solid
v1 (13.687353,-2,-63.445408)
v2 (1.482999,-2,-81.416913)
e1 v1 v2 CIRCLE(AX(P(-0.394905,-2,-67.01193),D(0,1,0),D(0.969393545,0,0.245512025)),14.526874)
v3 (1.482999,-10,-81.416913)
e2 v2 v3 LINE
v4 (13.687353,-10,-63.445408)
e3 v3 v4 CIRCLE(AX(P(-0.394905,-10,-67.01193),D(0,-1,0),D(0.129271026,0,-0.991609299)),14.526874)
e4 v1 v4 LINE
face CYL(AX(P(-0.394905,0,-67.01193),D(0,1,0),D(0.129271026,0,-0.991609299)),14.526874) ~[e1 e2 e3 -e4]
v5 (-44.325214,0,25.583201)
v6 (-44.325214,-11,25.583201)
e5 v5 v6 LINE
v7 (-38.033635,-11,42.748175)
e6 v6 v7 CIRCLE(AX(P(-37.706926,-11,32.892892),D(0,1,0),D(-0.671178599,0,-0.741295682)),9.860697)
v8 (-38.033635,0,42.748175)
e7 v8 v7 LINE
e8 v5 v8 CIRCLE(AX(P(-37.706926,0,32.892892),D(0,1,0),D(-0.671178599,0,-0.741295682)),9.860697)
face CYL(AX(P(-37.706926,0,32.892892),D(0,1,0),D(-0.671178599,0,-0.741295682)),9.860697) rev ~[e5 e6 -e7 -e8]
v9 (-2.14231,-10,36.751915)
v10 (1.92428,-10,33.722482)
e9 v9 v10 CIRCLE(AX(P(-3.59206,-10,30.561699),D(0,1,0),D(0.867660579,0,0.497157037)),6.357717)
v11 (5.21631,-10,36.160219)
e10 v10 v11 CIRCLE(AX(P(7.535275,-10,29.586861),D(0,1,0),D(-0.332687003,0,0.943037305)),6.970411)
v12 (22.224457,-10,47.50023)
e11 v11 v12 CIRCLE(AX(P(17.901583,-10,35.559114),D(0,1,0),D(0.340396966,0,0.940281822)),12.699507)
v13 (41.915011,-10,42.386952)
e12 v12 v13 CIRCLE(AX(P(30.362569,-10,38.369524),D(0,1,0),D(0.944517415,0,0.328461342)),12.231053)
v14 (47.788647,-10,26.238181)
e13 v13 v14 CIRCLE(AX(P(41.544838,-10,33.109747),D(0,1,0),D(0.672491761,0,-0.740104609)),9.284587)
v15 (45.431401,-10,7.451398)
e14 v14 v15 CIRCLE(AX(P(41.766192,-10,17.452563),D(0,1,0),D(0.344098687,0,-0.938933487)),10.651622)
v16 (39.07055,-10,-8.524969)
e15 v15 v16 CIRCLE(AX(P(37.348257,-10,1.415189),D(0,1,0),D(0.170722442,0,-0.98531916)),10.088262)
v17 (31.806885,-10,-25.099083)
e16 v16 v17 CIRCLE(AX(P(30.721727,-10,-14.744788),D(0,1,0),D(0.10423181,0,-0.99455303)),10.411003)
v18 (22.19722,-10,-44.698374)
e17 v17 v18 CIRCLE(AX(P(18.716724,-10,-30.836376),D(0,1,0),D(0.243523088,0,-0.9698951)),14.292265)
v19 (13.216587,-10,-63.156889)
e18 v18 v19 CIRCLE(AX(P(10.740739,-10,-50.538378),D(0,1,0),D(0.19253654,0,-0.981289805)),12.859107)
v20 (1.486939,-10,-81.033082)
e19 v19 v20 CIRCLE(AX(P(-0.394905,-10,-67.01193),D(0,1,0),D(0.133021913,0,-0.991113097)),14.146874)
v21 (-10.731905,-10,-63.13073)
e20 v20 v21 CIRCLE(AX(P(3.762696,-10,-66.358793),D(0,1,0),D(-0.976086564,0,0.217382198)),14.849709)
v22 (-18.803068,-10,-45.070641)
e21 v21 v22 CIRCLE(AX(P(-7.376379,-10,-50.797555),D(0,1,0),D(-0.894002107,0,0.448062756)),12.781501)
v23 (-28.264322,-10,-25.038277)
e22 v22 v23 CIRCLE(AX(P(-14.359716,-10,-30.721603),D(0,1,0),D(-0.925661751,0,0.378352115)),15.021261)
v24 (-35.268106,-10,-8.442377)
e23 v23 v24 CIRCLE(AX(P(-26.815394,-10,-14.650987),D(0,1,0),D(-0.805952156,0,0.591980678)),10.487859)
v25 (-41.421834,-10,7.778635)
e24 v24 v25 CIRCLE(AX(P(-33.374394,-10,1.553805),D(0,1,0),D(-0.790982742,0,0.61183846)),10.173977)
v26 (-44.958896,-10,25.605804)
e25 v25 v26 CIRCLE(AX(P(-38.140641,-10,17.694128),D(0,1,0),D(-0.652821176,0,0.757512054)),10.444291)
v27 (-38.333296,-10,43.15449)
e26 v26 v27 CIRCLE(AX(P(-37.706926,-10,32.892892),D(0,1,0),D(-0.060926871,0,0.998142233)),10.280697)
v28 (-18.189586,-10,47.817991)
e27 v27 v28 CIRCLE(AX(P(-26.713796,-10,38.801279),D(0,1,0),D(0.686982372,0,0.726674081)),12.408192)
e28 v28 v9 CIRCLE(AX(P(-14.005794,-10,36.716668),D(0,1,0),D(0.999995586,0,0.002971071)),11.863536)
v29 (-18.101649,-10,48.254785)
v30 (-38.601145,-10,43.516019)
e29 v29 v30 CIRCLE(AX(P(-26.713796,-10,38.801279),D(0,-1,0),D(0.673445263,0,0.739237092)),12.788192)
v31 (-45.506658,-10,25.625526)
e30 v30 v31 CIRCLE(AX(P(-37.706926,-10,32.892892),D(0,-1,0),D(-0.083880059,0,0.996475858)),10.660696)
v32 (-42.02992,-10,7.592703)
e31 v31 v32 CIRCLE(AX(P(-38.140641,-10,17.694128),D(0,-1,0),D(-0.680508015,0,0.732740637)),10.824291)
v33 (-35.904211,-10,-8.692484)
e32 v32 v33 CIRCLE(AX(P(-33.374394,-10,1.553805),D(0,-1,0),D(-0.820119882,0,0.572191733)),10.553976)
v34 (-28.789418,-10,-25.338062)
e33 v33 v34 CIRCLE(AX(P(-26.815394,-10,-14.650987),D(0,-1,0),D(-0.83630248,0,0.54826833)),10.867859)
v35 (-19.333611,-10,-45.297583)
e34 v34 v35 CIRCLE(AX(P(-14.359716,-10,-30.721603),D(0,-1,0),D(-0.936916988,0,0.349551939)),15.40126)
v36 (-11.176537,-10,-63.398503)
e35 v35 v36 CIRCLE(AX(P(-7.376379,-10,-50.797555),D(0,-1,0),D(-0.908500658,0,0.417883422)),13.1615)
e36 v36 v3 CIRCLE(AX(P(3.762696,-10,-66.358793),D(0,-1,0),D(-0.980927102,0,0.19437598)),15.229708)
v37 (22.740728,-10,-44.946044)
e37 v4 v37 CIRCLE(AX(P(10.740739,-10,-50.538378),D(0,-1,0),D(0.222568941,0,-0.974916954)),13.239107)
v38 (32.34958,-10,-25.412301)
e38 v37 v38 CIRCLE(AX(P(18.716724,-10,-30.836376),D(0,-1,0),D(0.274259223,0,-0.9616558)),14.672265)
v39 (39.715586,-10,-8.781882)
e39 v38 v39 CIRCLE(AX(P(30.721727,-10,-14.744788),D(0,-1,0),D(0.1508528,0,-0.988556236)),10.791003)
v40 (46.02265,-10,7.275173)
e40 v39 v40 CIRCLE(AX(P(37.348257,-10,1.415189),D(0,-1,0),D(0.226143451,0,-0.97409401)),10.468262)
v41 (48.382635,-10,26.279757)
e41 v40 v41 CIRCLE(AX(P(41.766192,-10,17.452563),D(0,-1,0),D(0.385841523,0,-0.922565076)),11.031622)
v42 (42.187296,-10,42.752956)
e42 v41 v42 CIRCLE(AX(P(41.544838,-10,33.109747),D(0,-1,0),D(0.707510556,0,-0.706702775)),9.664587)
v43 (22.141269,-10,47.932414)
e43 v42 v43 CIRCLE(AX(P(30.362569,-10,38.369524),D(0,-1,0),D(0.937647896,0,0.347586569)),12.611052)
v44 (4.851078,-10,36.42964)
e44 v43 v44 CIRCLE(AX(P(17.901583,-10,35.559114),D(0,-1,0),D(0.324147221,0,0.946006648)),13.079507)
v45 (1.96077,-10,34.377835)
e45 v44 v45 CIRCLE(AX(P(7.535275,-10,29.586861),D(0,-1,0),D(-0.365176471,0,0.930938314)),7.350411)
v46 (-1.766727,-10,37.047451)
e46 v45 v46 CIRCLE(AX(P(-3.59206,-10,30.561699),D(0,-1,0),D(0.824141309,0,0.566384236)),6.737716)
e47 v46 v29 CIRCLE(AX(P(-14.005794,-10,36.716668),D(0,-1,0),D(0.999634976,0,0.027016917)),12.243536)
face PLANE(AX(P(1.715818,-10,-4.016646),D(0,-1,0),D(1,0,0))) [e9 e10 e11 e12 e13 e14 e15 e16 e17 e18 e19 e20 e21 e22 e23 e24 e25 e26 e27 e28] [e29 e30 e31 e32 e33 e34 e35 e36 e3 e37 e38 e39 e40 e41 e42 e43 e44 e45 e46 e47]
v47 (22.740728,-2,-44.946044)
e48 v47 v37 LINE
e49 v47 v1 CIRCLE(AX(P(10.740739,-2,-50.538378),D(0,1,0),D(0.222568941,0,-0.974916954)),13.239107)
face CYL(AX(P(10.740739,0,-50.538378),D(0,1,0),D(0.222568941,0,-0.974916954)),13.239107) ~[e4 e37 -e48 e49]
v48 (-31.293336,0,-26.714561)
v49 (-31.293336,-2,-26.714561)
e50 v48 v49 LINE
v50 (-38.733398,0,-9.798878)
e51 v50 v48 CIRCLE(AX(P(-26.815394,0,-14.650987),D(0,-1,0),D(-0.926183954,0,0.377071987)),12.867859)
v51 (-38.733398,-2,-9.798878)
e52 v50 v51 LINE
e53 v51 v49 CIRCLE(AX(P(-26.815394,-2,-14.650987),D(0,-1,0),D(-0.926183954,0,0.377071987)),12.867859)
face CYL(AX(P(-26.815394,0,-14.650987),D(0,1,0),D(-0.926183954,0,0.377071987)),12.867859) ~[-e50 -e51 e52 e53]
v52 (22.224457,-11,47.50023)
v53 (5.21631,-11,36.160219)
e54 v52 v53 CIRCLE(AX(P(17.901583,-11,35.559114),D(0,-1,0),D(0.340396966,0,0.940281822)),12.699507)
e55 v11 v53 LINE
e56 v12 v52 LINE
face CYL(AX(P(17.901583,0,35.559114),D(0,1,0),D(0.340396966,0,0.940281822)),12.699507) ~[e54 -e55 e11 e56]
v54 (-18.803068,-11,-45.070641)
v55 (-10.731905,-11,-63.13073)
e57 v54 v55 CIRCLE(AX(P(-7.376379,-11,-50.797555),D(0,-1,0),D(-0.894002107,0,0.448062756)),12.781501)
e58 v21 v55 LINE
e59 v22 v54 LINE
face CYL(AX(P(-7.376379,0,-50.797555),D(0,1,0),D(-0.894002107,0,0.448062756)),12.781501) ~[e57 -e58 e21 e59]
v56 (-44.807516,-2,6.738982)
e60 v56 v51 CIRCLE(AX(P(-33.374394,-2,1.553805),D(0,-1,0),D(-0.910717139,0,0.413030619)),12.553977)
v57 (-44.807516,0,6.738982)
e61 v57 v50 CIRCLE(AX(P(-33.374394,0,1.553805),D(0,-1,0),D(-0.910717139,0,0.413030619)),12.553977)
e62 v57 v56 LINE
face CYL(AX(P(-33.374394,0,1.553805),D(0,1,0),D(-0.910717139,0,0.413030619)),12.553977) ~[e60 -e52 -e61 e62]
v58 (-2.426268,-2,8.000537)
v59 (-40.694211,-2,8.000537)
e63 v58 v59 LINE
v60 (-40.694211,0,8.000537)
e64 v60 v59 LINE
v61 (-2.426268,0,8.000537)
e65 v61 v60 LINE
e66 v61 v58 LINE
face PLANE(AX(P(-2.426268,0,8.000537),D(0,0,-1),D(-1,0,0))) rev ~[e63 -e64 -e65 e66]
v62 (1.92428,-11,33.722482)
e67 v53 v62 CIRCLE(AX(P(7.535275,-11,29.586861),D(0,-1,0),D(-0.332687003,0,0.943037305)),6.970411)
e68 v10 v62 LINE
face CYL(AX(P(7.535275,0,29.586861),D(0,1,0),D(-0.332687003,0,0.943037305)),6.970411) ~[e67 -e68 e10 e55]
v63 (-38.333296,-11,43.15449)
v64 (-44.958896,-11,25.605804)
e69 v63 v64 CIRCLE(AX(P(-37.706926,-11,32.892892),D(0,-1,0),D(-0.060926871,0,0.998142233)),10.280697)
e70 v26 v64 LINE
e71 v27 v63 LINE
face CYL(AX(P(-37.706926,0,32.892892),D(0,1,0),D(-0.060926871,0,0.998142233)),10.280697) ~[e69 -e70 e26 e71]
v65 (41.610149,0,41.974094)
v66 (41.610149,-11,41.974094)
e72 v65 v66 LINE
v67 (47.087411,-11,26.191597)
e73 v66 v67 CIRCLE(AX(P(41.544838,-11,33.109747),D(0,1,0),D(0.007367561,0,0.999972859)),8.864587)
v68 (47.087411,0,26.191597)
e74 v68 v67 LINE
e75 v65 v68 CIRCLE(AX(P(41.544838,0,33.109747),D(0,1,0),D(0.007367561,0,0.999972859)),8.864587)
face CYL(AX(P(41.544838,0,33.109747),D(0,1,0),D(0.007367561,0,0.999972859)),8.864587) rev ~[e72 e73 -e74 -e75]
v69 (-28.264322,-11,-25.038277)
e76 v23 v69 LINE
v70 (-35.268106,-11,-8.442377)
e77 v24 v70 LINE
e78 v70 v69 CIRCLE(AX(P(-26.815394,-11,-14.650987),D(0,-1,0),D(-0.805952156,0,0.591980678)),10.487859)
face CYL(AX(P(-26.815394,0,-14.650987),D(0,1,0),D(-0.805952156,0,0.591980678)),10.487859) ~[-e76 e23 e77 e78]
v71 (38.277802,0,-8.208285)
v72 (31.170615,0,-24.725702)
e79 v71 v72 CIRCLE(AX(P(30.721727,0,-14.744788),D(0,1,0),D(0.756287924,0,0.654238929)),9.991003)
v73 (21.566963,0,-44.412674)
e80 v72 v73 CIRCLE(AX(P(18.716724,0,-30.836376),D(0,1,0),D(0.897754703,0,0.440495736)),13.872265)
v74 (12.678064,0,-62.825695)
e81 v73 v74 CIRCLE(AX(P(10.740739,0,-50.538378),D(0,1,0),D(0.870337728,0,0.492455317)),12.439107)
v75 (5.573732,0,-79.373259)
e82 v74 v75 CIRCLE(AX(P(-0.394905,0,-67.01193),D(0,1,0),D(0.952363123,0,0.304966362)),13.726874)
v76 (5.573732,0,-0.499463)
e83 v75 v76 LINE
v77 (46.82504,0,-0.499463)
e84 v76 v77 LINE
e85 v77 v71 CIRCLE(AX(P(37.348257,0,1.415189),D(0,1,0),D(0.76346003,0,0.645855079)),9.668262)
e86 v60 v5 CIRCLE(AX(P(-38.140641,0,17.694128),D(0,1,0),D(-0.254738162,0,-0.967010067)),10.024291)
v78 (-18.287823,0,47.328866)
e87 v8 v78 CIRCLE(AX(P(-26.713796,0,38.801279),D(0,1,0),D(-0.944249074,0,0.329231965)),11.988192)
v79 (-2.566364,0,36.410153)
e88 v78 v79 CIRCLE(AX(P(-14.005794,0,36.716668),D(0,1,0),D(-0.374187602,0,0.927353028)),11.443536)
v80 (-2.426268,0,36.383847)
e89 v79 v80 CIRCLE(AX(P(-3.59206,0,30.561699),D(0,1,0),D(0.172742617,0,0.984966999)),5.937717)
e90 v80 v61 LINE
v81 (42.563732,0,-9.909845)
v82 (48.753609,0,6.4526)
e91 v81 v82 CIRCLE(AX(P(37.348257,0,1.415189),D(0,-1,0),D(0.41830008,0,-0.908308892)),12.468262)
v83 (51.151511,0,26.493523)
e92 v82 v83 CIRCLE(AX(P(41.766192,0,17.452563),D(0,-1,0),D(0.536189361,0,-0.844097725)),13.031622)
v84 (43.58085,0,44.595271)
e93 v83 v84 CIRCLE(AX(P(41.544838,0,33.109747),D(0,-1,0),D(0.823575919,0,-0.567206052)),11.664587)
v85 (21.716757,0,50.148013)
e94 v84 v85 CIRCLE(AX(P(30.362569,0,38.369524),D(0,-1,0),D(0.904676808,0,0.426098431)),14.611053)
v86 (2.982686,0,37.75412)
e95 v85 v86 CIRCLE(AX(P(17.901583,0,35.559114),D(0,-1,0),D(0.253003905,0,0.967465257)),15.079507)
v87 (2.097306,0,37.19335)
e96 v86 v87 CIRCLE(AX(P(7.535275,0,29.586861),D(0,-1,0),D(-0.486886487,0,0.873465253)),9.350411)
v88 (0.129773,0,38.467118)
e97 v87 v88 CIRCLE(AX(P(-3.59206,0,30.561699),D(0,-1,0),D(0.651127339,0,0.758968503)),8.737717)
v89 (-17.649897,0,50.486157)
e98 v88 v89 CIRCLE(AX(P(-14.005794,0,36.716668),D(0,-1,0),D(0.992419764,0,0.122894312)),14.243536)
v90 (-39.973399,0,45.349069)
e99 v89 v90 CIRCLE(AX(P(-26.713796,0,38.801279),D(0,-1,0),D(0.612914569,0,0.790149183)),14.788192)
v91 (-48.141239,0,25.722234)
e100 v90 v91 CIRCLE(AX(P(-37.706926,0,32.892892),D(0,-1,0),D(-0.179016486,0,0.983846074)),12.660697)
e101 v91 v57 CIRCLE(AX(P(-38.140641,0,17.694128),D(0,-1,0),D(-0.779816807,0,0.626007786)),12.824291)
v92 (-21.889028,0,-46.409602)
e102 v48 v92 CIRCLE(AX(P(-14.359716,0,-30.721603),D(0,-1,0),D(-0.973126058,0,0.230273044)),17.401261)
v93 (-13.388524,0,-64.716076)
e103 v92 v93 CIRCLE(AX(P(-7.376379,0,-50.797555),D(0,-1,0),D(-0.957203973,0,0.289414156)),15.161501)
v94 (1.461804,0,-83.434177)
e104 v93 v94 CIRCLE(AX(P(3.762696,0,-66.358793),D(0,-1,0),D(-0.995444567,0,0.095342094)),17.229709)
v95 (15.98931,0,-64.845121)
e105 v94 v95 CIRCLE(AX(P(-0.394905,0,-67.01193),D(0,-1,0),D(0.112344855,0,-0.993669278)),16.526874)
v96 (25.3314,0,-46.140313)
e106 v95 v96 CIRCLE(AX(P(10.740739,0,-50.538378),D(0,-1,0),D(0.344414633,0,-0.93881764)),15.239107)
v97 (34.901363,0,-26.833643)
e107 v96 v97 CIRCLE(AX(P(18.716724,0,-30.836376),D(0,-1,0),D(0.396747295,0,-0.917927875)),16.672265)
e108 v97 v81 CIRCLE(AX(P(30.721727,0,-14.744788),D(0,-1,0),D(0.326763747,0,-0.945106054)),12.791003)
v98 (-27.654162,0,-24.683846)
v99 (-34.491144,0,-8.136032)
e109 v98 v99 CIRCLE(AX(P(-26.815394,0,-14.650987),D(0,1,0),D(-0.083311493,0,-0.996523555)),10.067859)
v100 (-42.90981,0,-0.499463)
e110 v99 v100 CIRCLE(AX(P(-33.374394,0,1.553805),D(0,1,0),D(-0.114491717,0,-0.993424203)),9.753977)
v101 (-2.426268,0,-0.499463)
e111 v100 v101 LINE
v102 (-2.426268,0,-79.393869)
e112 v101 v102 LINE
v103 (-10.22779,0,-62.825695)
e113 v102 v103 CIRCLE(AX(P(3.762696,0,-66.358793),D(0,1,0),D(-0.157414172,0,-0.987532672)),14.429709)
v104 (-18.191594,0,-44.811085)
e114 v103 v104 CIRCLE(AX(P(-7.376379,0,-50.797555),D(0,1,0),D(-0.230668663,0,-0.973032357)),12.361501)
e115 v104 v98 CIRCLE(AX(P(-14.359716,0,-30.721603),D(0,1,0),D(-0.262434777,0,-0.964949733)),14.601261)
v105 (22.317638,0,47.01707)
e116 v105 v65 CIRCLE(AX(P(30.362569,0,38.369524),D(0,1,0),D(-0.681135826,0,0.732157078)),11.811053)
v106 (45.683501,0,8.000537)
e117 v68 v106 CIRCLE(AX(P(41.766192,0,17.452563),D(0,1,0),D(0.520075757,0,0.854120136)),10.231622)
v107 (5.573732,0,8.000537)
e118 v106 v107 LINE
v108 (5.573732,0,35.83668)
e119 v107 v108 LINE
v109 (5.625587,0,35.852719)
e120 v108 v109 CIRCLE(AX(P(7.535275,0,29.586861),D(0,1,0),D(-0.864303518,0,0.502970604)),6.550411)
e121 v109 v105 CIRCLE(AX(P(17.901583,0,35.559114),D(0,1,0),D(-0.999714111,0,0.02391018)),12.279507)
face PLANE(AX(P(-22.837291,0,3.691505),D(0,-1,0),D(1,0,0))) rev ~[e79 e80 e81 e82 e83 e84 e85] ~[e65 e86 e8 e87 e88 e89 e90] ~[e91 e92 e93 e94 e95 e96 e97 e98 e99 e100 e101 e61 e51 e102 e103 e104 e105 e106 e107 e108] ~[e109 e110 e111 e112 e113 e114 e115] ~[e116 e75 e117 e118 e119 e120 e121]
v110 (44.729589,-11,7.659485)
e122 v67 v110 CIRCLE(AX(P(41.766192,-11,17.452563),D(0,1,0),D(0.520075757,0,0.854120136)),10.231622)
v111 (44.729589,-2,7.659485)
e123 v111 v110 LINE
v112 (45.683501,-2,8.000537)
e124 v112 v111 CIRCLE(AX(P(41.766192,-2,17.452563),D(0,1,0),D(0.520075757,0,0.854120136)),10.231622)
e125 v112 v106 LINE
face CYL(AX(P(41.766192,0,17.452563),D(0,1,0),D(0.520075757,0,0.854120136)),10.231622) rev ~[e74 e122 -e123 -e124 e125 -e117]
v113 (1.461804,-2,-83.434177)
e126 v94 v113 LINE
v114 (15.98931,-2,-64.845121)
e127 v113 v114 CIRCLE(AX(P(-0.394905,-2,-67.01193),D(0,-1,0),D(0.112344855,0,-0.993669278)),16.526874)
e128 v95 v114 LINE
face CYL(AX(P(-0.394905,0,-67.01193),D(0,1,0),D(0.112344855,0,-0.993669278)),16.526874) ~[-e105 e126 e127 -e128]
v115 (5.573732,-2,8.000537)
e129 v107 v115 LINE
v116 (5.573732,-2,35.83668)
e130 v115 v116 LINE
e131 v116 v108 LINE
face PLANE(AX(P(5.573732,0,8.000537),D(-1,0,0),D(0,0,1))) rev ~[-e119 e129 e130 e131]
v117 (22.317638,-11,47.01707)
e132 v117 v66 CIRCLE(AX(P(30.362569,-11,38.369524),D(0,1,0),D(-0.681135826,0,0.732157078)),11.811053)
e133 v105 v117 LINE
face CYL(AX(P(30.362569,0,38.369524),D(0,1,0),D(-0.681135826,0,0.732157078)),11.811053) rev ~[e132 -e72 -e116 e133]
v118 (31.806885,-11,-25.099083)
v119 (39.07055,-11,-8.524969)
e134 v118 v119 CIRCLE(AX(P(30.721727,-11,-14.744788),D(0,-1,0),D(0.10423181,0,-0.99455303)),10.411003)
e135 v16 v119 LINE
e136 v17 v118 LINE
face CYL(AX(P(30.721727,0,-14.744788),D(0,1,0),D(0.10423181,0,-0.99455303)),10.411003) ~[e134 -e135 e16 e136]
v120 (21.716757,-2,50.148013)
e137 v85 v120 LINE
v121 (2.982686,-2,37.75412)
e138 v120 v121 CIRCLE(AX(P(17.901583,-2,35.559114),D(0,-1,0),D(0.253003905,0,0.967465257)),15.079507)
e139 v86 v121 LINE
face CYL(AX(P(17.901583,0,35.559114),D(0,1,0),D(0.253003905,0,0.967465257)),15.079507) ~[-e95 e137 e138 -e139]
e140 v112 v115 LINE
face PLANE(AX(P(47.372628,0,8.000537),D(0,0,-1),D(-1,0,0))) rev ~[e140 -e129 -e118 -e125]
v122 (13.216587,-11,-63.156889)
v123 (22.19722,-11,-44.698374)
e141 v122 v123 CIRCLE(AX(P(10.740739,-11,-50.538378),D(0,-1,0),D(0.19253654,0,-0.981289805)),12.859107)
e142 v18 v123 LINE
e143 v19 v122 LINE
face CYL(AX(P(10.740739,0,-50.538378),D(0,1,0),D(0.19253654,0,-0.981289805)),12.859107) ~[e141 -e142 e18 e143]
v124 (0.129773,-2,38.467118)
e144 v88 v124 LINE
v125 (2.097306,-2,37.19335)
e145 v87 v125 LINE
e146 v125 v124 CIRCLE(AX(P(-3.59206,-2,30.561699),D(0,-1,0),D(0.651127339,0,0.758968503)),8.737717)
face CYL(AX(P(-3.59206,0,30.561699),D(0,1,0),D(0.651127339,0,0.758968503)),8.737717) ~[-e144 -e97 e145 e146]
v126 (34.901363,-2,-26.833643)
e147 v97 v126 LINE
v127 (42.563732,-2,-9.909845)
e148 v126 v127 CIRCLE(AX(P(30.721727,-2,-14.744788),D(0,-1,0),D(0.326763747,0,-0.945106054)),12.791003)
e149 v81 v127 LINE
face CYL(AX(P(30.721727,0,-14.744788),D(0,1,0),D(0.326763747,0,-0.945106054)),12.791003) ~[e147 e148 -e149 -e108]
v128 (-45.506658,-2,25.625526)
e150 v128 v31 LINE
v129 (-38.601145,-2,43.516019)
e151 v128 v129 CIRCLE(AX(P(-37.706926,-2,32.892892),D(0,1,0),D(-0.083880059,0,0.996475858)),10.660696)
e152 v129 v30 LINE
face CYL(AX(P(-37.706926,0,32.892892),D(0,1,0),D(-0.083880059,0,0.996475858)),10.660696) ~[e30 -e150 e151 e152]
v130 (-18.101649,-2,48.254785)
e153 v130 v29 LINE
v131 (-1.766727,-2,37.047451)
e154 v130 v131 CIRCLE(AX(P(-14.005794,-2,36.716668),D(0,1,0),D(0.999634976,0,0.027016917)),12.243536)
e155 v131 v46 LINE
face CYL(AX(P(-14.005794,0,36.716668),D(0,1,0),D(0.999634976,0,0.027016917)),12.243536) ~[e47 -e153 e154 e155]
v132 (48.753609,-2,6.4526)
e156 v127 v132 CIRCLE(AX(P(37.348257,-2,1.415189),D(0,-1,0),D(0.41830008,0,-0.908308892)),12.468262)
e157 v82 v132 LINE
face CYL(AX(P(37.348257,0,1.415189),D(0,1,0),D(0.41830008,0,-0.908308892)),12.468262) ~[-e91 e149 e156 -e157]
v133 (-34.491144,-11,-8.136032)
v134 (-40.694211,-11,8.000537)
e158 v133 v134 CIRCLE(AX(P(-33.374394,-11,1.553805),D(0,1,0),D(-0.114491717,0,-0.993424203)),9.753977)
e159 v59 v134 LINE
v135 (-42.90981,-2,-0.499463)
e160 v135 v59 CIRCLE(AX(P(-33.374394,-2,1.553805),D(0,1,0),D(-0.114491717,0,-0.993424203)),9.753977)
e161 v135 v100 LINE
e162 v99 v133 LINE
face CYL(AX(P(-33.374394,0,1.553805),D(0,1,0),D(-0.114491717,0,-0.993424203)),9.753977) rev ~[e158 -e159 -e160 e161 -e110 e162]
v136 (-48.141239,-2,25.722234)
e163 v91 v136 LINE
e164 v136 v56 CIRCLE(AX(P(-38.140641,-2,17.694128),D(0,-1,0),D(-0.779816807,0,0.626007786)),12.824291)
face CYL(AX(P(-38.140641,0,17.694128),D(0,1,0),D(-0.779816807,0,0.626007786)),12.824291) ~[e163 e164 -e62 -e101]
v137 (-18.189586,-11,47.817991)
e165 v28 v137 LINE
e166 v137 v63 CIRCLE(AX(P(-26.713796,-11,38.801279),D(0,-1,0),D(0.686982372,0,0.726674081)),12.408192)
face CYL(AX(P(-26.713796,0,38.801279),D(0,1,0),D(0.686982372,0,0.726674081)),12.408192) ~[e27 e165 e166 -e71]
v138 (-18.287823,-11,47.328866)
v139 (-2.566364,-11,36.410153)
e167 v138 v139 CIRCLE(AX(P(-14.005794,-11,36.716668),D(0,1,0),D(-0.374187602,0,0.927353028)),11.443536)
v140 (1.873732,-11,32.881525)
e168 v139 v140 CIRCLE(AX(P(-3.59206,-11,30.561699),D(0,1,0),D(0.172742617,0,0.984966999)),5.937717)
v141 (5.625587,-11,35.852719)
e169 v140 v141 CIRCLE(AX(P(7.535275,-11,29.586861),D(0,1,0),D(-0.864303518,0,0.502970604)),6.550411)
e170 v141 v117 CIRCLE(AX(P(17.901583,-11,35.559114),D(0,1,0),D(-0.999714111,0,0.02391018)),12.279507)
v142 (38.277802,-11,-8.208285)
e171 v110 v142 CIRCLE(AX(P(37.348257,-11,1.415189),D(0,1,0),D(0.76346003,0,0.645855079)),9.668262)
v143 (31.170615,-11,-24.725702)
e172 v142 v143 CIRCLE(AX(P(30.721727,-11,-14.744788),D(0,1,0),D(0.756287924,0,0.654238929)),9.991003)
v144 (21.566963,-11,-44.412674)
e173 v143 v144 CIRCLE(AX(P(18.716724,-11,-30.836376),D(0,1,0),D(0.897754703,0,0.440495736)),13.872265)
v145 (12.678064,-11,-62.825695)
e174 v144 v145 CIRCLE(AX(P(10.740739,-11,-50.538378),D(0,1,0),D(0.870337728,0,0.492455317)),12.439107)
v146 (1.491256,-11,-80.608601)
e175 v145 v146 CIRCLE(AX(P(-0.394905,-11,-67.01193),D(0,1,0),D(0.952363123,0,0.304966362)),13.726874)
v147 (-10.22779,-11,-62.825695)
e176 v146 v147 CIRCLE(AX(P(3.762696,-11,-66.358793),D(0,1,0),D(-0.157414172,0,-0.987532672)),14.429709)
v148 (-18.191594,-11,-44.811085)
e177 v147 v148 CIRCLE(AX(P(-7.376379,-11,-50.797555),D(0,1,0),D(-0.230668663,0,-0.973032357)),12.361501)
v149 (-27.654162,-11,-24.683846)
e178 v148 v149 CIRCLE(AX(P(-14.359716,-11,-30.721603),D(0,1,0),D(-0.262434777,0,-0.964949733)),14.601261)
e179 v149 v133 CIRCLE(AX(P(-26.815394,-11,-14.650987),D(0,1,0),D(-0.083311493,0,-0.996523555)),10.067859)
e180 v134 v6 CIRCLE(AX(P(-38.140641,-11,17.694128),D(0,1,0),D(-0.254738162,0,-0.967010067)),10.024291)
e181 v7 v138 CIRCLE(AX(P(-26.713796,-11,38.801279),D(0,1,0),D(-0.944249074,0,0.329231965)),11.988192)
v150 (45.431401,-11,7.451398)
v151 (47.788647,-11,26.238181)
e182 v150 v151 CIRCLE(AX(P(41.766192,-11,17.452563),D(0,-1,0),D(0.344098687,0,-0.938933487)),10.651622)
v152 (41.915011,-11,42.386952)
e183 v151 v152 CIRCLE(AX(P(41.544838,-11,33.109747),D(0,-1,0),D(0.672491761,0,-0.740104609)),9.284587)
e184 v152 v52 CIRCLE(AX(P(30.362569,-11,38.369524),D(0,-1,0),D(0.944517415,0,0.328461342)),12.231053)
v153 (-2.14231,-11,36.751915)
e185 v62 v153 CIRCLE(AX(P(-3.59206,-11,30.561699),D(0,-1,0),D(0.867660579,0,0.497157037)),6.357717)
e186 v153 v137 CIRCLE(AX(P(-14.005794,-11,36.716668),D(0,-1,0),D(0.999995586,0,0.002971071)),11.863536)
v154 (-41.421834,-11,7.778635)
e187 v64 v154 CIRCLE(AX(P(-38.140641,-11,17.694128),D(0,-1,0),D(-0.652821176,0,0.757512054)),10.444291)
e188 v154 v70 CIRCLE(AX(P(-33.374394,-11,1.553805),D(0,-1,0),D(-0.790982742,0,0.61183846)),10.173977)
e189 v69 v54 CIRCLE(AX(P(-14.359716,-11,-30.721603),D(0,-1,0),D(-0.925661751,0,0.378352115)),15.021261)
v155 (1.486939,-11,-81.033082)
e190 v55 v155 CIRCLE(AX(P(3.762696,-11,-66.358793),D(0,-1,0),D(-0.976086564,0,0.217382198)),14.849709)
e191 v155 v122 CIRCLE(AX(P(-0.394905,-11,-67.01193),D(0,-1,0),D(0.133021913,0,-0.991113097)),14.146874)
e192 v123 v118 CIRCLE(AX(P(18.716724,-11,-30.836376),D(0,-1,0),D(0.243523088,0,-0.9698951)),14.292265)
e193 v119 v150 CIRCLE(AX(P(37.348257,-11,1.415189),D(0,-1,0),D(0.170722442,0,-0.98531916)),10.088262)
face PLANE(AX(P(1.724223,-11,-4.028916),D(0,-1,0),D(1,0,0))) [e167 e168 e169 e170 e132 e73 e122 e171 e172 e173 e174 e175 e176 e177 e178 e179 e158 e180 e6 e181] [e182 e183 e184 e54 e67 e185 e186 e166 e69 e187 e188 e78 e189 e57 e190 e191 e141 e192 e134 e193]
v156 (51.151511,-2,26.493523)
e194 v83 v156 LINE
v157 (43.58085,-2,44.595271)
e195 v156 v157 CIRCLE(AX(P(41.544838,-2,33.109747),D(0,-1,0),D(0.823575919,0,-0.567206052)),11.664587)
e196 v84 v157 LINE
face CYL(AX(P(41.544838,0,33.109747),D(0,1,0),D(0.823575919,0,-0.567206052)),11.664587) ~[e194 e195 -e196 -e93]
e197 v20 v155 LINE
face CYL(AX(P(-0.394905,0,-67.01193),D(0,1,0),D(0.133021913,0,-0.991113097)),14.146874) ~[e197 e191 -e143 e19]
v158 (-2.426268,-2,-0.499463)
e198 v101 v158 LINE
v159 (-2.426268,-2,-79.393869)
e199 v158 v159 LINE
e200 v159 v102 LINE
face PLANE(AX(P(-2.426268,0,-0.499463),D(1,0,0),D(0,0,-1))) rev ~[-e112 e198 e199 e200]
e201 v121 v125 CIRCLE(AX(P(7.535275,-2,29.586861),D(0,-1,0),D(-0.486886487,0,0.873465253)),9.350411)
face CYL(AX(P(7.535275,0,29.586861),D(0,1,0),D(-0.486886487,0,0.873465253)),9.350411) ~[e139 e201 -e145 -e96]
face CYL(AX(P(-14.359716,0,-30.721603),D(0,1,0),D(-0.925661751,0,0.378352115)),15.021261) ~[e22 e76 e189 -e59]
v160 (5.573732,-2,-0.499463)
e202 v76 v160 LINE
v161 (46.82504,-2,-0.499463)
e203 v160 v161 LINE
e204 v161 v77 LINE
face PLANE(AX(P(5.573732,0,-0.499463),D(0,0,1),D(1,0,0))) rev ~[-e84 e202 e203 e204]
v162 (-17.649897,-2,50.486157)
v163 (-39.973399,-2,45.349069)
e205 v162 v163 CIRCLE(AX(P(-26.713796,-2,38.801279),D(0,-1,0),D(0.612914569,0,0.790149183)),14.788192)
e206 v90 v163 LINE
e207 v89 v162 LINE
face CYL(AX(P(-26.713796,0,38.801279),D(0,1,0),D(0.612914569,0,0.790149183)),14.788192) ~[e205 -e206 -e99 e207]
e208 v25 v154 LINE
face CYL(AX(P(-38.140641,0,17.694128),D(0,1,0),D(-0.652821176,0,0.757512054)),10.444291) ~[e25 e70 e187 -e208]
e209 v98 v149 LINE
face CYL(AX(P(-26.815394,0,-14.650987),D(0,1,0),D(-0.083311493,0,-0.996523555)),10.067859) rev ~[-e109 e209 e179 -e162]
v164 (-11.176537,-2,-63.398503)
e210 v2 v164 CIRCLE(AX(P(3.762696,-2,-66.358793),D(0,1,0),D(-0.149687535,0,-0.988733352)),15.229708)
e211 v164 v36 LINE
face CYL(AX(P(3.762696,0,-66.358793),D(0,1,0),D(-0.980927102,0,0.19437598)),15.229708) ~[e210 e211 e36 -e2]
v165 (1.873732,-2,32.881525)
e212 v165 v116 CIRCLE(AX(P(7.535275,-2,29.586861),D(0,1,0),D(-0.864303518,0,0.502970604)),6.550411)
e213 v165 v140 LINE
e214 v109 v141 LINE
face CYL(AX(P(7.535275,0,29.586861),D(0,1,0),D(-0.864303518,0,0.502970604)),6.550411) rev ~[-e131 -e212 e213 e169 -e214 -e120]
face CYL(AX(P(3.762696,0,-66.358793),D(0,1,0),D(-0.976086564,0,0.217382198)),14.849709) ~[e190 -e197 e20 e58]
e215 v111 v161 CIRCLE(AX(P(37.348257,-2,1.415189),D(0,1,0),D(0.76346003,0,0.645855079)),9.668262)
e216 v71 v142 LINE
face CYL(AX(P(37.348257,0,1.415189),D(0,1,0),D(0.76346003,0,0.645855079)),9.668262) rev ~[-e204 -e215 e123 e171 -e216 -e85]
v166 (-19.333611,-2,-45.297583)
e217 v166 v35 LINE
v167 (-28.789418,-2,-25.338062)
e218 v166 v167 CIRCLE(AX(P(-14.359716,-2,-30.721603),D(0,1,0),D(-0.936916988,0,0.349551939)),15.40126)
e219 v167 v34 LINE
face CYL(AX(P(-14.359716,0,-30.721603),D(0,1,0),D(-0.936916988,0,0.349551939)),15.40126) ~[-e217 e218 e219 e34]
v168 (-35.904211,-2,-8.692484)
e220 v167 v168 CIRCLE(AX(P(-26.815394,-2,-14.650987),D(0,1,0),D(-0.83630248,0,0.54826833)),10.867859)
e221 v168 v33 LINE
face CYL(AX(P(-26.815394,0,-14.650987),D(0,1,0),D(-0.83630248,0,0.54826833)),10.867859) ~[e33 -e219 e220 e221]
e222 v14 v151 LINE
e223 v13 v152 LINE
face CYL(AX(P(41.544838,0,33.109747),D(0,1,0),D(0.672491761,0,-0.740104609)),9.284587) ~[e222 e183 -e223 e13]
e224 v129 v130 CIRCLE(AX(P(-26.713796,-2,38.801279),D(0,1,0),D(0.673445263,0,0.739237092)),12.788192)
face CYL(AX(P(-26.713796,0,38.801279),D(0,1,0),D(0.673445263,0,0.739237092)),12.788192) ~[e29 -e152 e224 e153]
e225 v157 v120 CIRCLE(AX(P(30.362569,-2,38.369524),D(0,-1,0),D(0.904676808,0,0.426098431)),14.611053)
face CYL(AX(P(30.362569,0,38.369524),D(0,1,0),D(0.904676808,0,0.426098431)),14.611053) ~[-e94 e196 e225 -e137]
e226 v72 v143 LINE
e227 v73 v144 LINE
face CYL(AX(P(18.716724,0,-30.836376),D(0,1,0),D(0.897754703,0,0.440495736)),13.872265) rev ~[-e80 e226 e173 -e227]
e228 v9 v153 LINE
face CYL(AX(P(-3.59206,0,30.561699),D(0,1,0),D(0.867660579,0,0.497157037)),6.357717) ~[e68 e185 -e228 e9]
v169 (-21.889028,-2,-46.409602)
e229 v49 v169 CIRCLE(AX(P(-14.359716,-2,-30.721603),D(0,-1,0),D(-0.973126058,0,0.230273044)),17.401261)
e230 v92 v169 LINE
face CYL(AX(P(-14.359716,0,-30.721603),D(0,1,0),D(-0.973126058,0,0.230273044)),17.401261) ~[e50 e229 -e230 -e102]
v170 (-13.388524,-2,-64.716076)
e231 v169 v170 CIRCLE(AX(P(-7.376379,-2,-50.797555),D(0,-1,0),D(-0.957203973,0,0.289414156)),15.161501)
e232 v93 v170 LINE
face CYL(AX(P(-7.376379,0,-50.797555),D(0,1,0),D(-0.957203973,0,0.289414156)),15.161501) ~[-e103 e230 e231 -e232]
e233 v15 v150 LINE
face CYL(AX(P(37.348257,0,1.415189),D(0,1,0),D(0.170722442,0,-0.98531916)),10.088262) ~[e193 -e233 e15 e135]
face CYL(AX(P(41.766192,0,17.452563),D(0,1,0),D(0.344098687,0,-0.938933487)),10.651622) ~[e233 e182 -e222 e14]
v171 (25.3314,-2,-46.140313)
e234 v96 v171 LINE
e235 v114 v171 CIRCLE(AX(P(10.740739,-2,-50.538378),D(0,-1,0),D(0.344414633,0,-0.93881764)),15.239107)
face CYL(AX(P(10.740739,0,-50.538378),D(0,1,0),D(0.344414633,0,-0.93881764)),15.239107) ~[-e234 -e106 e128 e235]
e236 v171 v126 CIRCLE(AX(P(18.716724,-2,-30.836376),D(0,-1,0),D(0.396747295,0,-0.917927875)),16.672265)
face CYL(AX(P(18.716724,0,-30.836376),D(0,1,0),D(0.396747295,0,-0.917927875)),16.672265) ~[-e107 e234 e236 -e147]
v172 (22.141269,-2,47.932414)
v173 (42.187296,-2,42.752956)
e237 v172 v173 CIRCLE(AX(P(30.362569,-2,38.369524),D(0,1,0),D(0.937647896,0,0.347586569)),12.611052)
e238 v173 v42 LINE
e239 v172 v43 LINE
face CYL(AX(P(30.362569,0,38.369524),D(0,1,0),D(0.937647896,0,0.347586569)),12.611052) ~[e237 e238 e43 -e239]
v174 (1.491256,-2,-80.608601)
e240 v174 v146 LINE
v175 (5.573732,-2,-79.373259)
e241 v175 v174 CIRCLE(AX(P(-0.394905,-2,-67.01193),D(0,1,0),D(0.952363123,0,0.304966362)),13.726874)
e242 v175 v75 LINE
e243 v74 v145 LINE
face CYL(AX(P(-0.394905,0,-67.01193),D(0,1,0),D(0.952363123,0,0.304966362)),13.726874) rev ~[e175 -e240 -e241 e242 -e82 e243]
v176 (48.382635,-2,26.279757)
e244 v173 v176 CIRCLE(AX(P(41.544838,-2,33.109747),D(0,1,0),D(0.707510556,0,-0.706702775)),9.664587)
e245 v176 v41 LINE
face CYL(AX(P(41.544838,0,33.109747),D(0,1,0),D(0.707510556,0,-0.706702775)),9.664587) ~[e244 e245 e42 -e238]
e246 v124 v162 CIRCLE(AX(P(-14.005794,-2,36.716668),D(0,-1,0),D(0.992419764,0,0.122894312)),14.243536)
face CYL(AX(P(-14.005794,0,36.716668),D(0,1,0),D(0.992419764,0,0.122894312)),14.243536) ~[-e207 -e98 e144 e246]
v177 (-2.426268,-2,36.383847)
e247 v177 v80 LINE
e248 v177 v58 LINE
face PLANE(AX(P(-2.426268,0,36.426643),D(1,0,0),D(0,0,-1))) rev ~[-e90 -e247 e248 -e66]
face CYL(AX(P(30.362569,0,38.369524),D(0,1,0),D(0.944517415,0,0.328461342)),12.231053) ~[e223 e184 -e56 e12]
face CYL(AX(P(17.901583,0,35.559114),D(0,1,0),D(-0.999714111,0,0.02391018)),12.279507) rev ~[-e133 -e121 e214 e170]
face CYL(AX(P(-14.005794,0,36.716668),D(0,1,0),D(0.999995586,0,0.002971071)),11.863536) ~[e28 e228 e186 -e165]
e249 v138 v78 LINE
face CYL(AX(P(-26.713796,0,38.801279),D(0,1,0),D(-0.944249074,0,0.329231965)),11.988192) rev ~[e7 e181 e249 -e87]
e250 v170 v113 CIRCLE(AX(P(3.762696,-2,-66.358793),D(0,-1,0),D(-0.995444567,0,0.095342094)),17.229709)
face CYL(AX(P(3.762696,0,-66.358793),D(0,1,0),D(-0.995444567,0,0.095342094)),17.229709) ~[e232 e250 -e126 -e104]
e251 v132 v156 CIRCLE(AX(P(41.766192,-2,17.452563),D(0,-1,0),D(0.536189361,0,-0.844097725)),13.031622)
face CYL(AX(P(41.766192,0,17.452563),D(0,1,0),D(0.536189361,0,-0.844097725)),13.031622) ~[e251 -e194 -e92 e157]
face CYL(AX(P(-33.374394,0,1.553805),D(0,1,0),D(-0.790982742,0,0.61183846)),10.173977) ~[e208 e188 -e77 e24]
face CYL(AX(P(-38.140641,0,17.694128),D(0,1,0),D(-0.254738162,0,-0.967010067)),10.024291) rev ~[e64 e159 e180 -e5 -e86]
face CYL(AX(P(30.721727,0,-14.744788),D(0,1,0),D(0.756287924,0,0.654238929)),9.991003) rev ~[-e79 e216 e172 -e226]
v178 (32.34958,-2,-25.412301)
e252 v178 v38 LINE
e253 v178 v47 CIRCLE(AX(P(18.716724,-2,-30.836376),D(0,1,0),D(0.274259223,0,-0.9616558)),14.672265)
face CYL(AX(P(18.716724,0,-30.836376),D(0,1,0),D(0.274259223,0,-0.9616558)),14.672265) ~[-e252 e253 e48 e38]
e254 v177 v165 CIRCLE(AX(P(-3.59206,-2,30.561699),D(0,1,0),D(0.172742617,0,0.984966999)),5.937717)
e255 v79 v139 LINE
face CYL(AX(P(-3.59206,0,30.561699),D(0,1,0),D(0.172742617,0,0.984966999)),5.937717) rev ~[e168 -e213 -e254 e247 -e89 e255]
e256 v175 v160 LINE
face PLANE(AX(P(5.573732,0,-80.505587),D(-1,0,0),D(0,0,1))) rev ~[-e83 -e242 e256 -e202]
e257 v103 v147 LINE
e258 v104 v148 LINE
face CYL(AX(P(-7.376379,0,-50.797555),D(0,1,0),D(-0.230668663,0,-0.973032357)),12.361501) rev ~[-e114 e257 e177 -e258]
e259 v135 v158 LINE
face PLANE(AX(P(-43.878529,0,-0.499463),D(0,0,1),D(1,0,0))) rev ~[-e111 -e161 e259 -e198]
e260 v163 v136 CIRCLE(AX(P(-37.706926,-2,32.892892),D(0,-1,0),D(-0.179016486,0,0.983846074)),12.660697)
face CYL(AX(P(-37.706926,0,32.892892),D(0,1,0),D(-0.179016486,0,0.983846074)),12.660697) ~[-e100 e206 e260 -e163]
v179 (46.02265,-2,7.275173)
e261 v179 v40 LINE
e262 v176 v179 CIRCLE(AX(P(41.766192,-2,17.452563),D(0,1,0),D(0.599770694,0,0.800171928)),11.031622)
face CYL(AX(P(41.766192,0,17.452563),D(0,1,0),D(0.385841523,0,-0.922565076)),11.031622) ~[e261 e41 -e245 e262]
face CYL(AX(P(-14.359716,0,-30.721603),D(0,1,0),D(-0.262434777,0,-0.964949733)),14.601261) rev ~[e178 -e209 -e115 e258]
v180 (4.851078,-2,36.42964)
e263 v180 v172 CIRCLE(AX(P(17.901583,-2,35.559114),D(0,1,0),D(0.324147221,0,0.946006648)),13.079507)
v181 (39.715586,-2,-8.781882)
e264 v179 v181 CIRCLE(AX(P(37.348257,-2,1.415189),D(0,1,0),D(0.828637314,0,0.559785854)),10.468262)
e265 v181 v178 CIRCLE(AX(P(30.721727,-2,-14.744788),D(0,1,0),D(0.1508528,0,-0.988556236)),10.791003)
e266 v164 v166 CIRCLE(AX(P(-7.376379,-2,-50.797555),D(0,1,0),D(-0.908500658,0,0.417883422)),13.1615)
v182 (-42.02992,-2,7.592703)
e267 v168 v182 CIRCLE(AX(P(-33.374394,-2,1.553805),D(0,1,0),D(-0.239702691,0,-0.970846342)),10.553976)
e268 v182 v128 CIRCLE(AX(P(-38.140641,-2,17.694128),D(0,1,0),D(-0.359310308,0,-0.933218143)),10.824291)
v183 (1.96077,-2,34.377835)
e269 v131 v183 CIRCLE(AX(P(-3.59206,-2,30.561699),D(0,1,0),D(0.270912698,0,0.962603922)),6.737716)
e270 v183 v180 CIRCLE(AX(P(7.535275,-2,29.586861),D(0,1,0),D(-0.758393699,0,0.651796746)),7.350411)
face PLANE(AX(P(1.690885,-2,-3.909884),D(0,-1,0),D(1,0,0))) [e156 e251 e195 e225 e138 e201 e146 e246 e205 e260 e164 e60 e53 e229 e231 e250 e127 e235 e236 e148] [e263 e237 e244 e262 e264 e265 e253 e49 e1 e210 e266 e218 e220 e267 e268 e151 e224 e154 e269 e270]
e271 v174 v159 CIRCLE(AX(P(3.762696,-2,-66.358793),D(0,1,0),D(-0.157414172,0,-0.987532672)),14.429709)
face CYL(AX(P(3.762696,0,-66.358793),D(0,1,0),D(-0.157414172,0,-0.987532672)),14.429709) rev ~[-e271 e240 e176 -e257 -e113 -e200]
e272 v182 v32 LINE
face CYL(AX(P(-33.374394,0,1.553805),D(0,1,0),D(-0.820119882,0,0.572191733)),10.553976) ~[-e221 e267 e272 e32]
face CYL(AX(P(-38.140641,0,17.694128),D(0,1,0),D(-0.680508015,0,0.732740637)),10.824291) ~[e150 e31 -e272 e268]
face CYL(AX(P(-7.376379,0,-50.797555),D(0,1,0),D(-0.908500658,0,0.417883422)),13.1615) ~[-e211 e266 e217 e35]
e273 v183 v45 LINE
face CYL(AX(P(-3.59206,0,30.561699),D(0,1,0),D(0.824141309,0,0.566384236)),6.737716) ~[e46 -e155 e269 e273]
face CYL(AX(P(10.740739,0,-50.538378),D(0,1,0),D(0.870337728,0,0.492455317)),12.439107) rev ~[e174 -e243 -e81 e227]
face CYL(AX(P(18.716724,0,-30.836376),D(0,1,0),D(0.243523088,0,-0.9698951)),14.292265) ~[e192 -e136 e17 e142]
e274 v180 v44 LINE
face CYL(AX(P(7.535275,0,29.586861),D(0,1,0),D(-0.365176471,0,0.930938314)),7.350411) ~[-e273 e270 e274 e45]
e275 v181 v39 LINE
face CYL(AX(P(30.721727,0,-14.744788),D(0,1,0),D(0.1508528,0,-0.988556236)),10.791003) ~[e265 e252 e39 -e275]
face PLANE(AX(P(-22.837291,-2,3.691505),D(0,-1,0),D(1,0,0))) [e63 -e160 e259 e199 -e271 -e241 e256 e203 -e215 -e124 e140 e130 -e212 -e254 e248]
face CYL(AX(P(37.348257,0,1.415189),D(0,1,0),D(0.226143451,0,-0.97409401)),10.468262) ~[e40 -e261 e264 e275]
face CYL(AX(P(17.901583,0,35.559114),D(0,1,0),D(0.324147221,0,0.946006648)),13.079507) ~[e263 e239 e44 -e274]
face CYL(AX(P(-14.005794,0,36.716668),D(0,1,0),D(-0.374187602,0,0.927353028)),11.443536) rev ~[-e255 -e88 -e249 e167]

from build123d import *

# Parameters (mm, degrees)
F1_DEPTH = 11
F3_DEPTH = 10
F5_DEPTH = 2
F6_W     = 8
F6_H     = 8.5
F7_DEPTH = 2


with BuildPart() as f1:
    # F0 (on Front) → F1 (new body)
    with BuildSketch(Plane.XZ):
        with BuildLine():
            ThreePointArc((39.0705500579, -8.52496936), (46.72096884, -2.3164746642), (45.4314010117, 7.451397609))
            ThreePointArc((45.4314010117, 7.451397609), (52.3349438106, 16.1264631775), (47.7886465249, 26.2381814678))
            ThreePointArc((47.7886465249, 26.2381814678), (50.2701969547, 36.2833369913), (41.9150114031, 42.3869520205))
            ThreePointArc((41.9150114031, 42.3869520205), (33.4367867693, 50.2079291964), (22.2244569704, 47.5002295437))
            ThreePointArc((22.2244569704, 47.5002295437), (10.8566281912, 46.1253851638), (5.2163100926, 36.1602188347))
            ThreePointArc((5.2163100926, 36.1602188347), (3.3871782253, 35.1886396049), (1.9242797709, 33.7224821441))
            ThreePointArc((1.9242797709, 33.7224821441), (0.2060931662, 35.6601876437), (-2.1423101686, 36.7519154435))
            ThreePointArc((-2.1423101686, 36.7519154435), (-7.2708907681, 46.4831703255), (-18.1895864419, 47.8179906611))
            ThreePointArc((-18.1895864419, 47.8179906611), (-29.5124145758, 50.8897432152), (-38.3332962899, 43.1544897295))
            ThreePointArc((-38.3332962899, 43.1544897295), (-47.3249375206, 36.5242237511), (-44.9588955164, 25.6058042591))
            ThreePointArc((-44.9588955164, 25.6058042591), (-48.3852347219, 15.6615137302), (-41.4218344822, 7.7786353488))
            ThreePointArc((-41.4218344822, 7.7786353488), (-42.8868566438, -2.0549157562), (-35.2681064262, -8.4423770976))
            ThreePointArc((-35.2681064262, -8.4423770976), (-36.4780330886, -18.7288037829), (-28.2643223371, -25.0382769915))
            ThreePointArc((-28.2643223371, -25.0382769915), (-27.9422707168, -37.1366223637), (-18.8030679193, -45.0706409052))
            ThreePointArc((-18.8030679193, -45.0706409052), (-19.0455768915, -56.0125901141), (-10.7319048048, -63.1307302875))
            ThreePointArc((-10.7319048048, -63.1307302875), (-8.5024893952, -74.7301167227), (1.486939211, -81.0330822839))
            ThreePointArc((1.486939211, -81.0330822839), (11.4330463974, -74.7729616567), (13.2165865743, -63.1568890473))
            ThreePointArc((13.2165865743, -63.1568890473), (22.3038978548, -56.1642100409), (22.1972204462, -44.6983735723))
            ThreePointArc((22.1972204462, -44.6983735723), (31.5494835172, -37.1283643345), (31.8068847226, -25.0990830165))
            ThreePointArc((31.8068847226, -25.0990830165), (40.2572033461, -18.9237451092), (39.0705500579, -8.52496936))
        make_face()
        with BuildLine():
            ThreePointArc((-18.287823031, 47.3288657516), (-7.4780325298, 46.1157556728), (-2.5663635332, 36.4101534549))
            ThreePointArc((-2.5663635332, 36.4101534549), (0.1022138006, 35.2102271012), (1.8737317574, 32.8815252377))
            ThreePointArc((1.8737317574, 32.8815252377), (3.4685951698, 34.7220338469), (5.6255866592, 35.8527190194))
            ThreePointArc((5.6255866592, 35.8527190194), (11.074771804, 45.7660203722), (22.3176378772, 47.0170698967))
            ThreePointArc((22.3176378772, 47.0170698967), (33.3495644247, 49.796633279), (41.6101485742, 41.9740937007))
            ThreePointArc((41.6101485742, 41.9740937007), (49.9194357762, 36.0161229225), (47.0874105005, 26.1915973646))
            ThreePointArc((47.0874105005, 26.1915973646), (51.915995427, 16.1612135783), (44.7295889669, 7.6594847256))
            ThreePointArc((44.7295889669, 7.6594847256), (46.3044950278, -2.2263904431), (38.2778021949, -8.2082847183))
            ThreePointArc((38.2778021949, -8.2082847183), (39.8992064768, -18.6937143429), (31.1706150566, -24.7257022472))
            ThreePointArc((31.1706150566, -24.7257022472), (31.1846152182, -36.91843323), (21.5669627376, -44.4126740578))
            ThreePointArc((21.5669627376, -44.4126740578), (21.9428314543, -55.9461967568), (12.6780636079, -62.8256952773))
            ThreePointArc((12.6780636079, -62.8256952773), (11.2241235412, -74.3211876976), (1.491255675, -80.6086013792))
            ThreePointArc((1.491255675, -80.6086013792), (-8.2859760991, -74.2989428398), (-10.2277903072, -62.8256952773))
            ThreePointArc((-10.2277903072, -62.8256952773), (-18.6823826488, -55.7956537612), (-18.1915944439, -44.8110853891))
            ThreePointArc((-18.1915944439, -44.8110853891), (-27.5735039539, -36.9338984851), (-27.6541622004, -24.6838456762))
            ThreePointArc((-27.6541622004, -24.6838456762), (-36.1203277284, -18.4954623496), (-34.4911439915, -8.1360315111))
            ThreePointArc((-34.4911439915, -8.1360315111), (-42.4788506232, -1.9460435419), (-40.6942105462, 8.0005371815))
            ThreePointArc((-40.6942105462, 8.0005371815), (-47.9577840613, 15.6667852228), (-44.3252140818, 25.5832006329))
            ThreePointArc((-44.3252140818, 25.5832006329), (-46.9652913596, 36.2864155083), (-38.0336352662, 42.7481750312))
            ThreePointArc((-38.0336352662, 42.7481750312), (-29.4229096781, 50.4793548119), (-18.287823031, 47.3288657516))
        make_face(mode=Mode.SUBTRACT)
    extrude(amount=F1_DEPTH)

    # F2 (on Front) → F3 (join)
    with BuildSketch(Plane.XZ):
        with BuildLine():
            ThreePointArc((-28.7894182833, -25.3380623372), (-28.2780674719, -37.315411053), (-19.3336110619, -45.2975825271))
            ThreePointArc((-19.3336110619, -45.2975825271), (-19.3757403856, -56.2049968971), (-11.1765373084, -63.3985031367))
            ThreePointArc((-11.1765373084, -63.3985031367), (-8.6987912382, -75.1140963115), (1.4829988261, -81.416913151))
            ThreePointArc((1.4829988261, -81.416913151), (11.6228084753, -75.1730955299), (13.6873525382, -63.445407948))
            ThreePointArc((13.6873525382, -63.445407948), (22.6321998986, -56.3579224617), (22.740727836, -44.9460441542))
            ThreePointArc((22.740727836, -44.9460441542), (31.8823212597, -37.3126706934), (32.3495800111, -25.4123013725))
            ThreePointArc((32.3495800111, -25.4123013725), (40.5882309676, -19.1148961819), (39.7155861385, -8.781882453))
            ThreePointArc((39.7155861385, -8.781882453), (47.09182758, -2.4119959763), (46.0226495696, 7.2751733683))
            ThreePointArc((46.0226495696, 7.2751733683), (52.7137277602, 16.0930995605), (48.3826353269, 26.279756913))
            ThreePointArc((48.3826353269, 26.279756913), (50.5908388805, 36.5118212888), (42.1872958021, 42.7529564461))
            ThreePointArc((42.1872958021, 42.7529564461), (33.5173854794, 50.579592633), (22.1412690395, 47.9324141817))
            ThreePointArc((22.1412690395, 47.9324141817), (10.6568550393, 46.4488985081), (4.851078209, 36.4296400985))
            ThreePointArc((4.851078209, 36.4296400985), (3.2803936817, 35.5805678874), (1.9607699749, 34.377834843))
            ThreePointArc((1.9607699749, 34.377834843), (0.3310806886, 36.0394522047), (-1.766727365, 37.0474506157))
            ThreePointArc((-1.766727365, 37.0474506157), (-7.079102033, 46.8124644401), (-18.1016485533, 48.254784727))
            ThreePointArc((-18.1016485533, 48.254784727), (-29.594023844, 51.2608992563), (-38.6011454354, 43.5160186875))
            ThreePointArc((-38.6011454354, 43.5160186875), (-47.6524591085, 36.7317470687), (-45.5066577228, 25.6255255231))
            ThreePointArc((-45.5066577228, 25.6255255231), (-48.7691918651, 15.6449376796), (-42.0299203098, 7.5927031056))
            ThreePointArc((-42.0299203098, 7.5927031056), (-43.2526434444, -2.1619201779), (-35.9042109813, -8.6924842885))
            ThreePointArc((-35.9042109813, -8.6924842885), (-36.8086632261, -18.922394093), (-28.7894182833, -25.3380623372))
        make_face()
        with BuildLine():
            ThreePointArc((1.491255675, -80.6086013792), (-8.2859760991, -74.2989428398), (-10.2277903072, -62.8256952773))
            ThreePointArc((-10.2277903072, -62.8256952773), (-18.6823826488, -55.7956537612), (-18.1915944439, -44.8110853891))
            ThreePointArc((-18.1915944439, -44.8110853891), (-27.5735039539, -36.9338984851), (-27.6541622004, -24.6838456762))
            ThreePointArc((-27.6541622004, -24.6838456762), (-36.1203277284, -18.4954623496), (-34.4911439915, -8.1360315111))
            ThreePointArc((-34.4911439915, -8.1360315111), (-42.4788506232, -1.9460435419), (-40.6942105462, 8.0005371815))
            ThreePointArc((-40.6942105462, 8.0005371815), (-47.9577840613, 15.6667852228), (-44.3252140818, 25.5832006329))
            ThreePointArc((-44.3252140818, 25.5832006329), (-46.9652913596, 36.2864155083), (-38.0336352662, 42.7481750312))
            ThreePointArc((-38.0336352662, 42.7481750312), (-29.4229096781, 50.4793548119), (-18.287823031, 47.3288657516))
            ThreePointArc((-18.287823031, 47.3288657516), (-7.4780325298, 46.1157556728), (-2.5663635332, 36.4101534549))
            ThreePointArc((-2.5663635332, 36.4101534549), (0.1022138006, 35.2102271012), (1.8737317574, 32.8815252377))
            ThreePointArc((1.8737317574, 32.8815252377), (3.4685951698, 34.7220338469), (5.6255866592, 35.8527190194))
            ThreePointArc((5.6255866592, 35.8527190194), (11.074771804, 45.7660203722), (22.3176378772, 47.0170698967))
            ThreePointArc((22.3176378772, 47.0170698967), (33.3495644247, 49.796633279), (41.6101485742, 41.9740937007))
            ThreePointArc((41.6101485742, 41.9740937007), (49.9194357762, 36.0161229225), (47.0874105005, 26.1915973646))
            ThreePointArc((47.0874105005, 26.1915973646), (51.915995427, 16.1612135783), (44.7295889669, 7.6594847256))
            ThreePointArc((44.7295889669, 7.6594847256), (46.3044950278, -2.2263904431), (38.2778021949, -8.2082847183))
            ThreePointArc((38.2778021949, -8.2082847183), (39.8992064768, -18.6937143429), (31.1706150566, -24.7257022472))
            ThreePointArc((31.1706150566, -24.7257022472), (31.1846152182, -36.91843323), (21.5669627376, -44.4126740578))
            ThreePointArc((21.5669627376, -44.4126740578), (21.9428314543, -55.9461967568), (12.6780636079, -62.8256952773))
            ThreePointArc((12.6780636079, -62.8256952773), (11.2241235412, -74.3211876976), (1.491255675, -80.6086013792))
        make_face(mode=Mode.SUBTRACT)
    extrude(amount=F3_DEPTH)

    # F4 (on Front) → F5 (join)
    with BuildSketch(Plane.XZ):
        with BuildLine():
            ThreePointArc((-31.2933360918, -26.7145614825), (-30.0626590432, -38.2196991357), (-21.8890280635, -46.4096023724))
            ThreePointArc((-21.8890280635, -46.4096023724), (-21.1276893783, -57.1828959351), (-13.3885235772, -64.716076106))
            ThreePointArc((-13.3885235772, -64.716076106), (-9.7350068872, -77.0674278864), (1.4618042214, -83.434177136))
            ThreePointArc((1.4618042214, -83.434177136), (12.6270411685, -77.1886920415), (15.9893100479, -64.845120916))
            ThreePointArc((15.9893100479, -64.845120916), (24.3740160314, -57.347499456), (25.3313999659, -46.140312566))
            ThreePointArc((25.3313999659, -46.140312566), (33.6545641024, -38.2407900675), (34.9013631871, -26.8336427909))
            ThreePointArc((34.9013631871, -26.8336427909), (42.3740651436, -20.0204664993), (42.5637323356, -9.9098447543))
            ThreePointArc((42.5637323356, -9.9098447543), (49.009962504, -2.9964088065), (48.7536090239, 6.4525997595))
            ThreePointArc((48.7536090239, 6.4525997595), (54.7055223286, 15.9043679712), (51.1515112452, 26.4935227786))
            ThreePointArc((51.1515112452, 26.4935227786), (52.3061738341, 37.6104413128), (43.5808496442, 44.5952706717))
            ThreePointArc((43.5808496442, 44.5952706717), (33.9591097891, 52.5310125566), (21.7167574574, 50.1480130832))
            ThreePointArc((21.7167574574, 50.1480130832), (9.581408462, 48.1355293439), (2.9826864127, 37.7541203183))
            ThreePointArc((2.9826864127, 37.7541203183), (2.5321333274, 37.4861496239), (2.0973058773, 37.1933502652))
            ThreePointArc((2.0973058773, 37.1933502652), (1.1564435593, 37.8965061856), (0.1297728303, 38.4671175807))
            ThreePointArc((0.1297728303, 38.4671175807), (-6.0288252744, 48.5169345665), (-17.6498973059, 50.4861569773))
            ThreePointArc((-17.6498973059, 50.4861569773), (-30.0301798203, 53.2128100125), (-39.9733990154, 45.3490689213))
            ThreePointArc((-39.9733990154, 45.3490689213), (-49.3958373956, 37.7573118999), (-48.1412388738, 25.7222339089))
            ThreePointArc((-48.1412388738, 25.7222339089), (-50.7716397612, 15.4759489819), (-44.8075162442, 6.7389818703))
            ThreePointArc((-44.8075162442, 6.7389818703), (-45.158666704, -2.7743885235), (-38.7333983934, -9.798877831))
            ThreePointArc((-38.7333983934, -9.798877831), (-38.5942671383, -19.8317147245), (-31.2933360918, -26.7145614825))
        make_face()
        with BuildLine():
            ThreePointArc((1.491255675, -80.6086013792), (-8.2859760991, -74.2989428398), (-10.2277903072, -62.8256952773))
            ThreePointArc((-10.2277903072, -62.8256952773), (-18.6823826488, -55.7956537612), (-18.1915944439, -44.8110853891))
            ThreePointArc((-18.1915944439, -44.8110853891), (-27.5735039539, -36.9338984851), (-27.6541622004, -24.6838456762))
            ThreePointArc((-27.6541622004, -24.6838456762), (-36.1203277284, -18.4954623496), (-34.4911439915, -8.1360315111))
            ThreePointArc((-34.4911439915, -8.1360315111), (-42.4788506232, -1.9460435419), (-40.6942105462, 8.0005371815))
            ThreePointArc((-40.6942105462, 8.0005371815), (-47.9577840613, 15.6667852228), (-44.3252140818, 25.5832006329))
            ThreePointArc((-44.3252140818, 25.5832006329), (-46.9652913596, 36.2864155083), (-38.0336352662, 42.7481750312))
            ThreePointArc((-38.0336352662, 42.7481750312), (-29.4229096781, 50.4793548119), (-18.287823031, 47.3288657516))
            ThreePointArc((-18.287823031, 47.3288657516), (-7.4780325298, 46.1157556728), (-2.5663635332, 36.4101534549))
            ThreePointArc((-2.5663635332, 36.4101534549), (0.1022138006, 35.2102271012), (1.8737317574, 32.8815252377))
            ThreePointArc((1.8737317574, 32.8815252377), (3.4685951698, 34.7220338469), (5.6255866592, 35.8527190194))
            ThreePointArc((5.6255866592, 35.8527190194), (11.074771804, 45.7660203722), (22.3176378772, 47.0170698967))
            ThreePointArc((22.3176378772, 47.0170698967), (33.3495644247, 49.796633279), (41.6101485742, 41.9740937007))
            ThreePointArc((41.6101485742, 41.9740937007), (49.9194357762, 36.0161229225), (47.0874105005, 26.1915973646))
            ThreePointArc((47.0874105005, 26.1915973646), (51.915995427, 16.1612135783), (44.7295889669, 7.6594847256))
            ThreePointArc((44.7295889669, 7.6594847256), (46.3044950278, -2.2263904431), (38.2778021949, -8.2082847183))
            ThreePointArc((38.2778021949, -8.2082847183), (39.8992064768, -18.6937143429), (31.1706150566, -24.7257022472))
            ThreePointArc((31.1706150566, -24.7257022472), (31.1846152182, -36.91843323), (21.5669627376, -44.4126740578))
            ThreePointArc((21.5669627376, -44.4126740578), (21.9428314543, -55.9461967568), (12.6780636079, -62.8256952773))
            ThreePointArc((12.6780636079, -62.8256952773), (11.2241235412, -74.3211876976), (1.491255675, -80.6086013792))
        make_face(mode=Mode.SUBTRACT)
    extrude(amount=F5_DEPTH)

    # F6 (on Front) → F7 (join)
    with BuildSketch(Plane.XZ):
        Polygon((-2.4262682426, 8.0005371815), (-42.5083744706, 8.0005371815), (-43.8785292208, -0.4994628185), (-2.4262682426, -0.4994628185), align=None)
        Polygon((-2.4262682426, 36.4266432116), (-2.4262682426, 8.0005371815), (5.5737317574, 8.0005371815), (5.5737317574, 35.8574517777), (2.2378848509, 35.5696513543), align=None)
        with Locations((1.5737317574, 3.7505371815)):
            Rectangle(F6_W, F6_H)
        Polygon((5.5737317574, -0.4994628185), (-2.4262682426, -0.4994628185), (-2.4262682426, -80.5981069097), (0.7191397591, -81.807880033), (5.5737317574, -80.5055871606), align=None)
        Polygon((47.3726280034, 8.0005371815), (5.5737317574, 8.0005371815), (5.5737317574, -0.4994628185), (48.0919629335, -0.4994628185), align=None)
    extrude(amount=F7_DEPTH)


solid = f1.part
